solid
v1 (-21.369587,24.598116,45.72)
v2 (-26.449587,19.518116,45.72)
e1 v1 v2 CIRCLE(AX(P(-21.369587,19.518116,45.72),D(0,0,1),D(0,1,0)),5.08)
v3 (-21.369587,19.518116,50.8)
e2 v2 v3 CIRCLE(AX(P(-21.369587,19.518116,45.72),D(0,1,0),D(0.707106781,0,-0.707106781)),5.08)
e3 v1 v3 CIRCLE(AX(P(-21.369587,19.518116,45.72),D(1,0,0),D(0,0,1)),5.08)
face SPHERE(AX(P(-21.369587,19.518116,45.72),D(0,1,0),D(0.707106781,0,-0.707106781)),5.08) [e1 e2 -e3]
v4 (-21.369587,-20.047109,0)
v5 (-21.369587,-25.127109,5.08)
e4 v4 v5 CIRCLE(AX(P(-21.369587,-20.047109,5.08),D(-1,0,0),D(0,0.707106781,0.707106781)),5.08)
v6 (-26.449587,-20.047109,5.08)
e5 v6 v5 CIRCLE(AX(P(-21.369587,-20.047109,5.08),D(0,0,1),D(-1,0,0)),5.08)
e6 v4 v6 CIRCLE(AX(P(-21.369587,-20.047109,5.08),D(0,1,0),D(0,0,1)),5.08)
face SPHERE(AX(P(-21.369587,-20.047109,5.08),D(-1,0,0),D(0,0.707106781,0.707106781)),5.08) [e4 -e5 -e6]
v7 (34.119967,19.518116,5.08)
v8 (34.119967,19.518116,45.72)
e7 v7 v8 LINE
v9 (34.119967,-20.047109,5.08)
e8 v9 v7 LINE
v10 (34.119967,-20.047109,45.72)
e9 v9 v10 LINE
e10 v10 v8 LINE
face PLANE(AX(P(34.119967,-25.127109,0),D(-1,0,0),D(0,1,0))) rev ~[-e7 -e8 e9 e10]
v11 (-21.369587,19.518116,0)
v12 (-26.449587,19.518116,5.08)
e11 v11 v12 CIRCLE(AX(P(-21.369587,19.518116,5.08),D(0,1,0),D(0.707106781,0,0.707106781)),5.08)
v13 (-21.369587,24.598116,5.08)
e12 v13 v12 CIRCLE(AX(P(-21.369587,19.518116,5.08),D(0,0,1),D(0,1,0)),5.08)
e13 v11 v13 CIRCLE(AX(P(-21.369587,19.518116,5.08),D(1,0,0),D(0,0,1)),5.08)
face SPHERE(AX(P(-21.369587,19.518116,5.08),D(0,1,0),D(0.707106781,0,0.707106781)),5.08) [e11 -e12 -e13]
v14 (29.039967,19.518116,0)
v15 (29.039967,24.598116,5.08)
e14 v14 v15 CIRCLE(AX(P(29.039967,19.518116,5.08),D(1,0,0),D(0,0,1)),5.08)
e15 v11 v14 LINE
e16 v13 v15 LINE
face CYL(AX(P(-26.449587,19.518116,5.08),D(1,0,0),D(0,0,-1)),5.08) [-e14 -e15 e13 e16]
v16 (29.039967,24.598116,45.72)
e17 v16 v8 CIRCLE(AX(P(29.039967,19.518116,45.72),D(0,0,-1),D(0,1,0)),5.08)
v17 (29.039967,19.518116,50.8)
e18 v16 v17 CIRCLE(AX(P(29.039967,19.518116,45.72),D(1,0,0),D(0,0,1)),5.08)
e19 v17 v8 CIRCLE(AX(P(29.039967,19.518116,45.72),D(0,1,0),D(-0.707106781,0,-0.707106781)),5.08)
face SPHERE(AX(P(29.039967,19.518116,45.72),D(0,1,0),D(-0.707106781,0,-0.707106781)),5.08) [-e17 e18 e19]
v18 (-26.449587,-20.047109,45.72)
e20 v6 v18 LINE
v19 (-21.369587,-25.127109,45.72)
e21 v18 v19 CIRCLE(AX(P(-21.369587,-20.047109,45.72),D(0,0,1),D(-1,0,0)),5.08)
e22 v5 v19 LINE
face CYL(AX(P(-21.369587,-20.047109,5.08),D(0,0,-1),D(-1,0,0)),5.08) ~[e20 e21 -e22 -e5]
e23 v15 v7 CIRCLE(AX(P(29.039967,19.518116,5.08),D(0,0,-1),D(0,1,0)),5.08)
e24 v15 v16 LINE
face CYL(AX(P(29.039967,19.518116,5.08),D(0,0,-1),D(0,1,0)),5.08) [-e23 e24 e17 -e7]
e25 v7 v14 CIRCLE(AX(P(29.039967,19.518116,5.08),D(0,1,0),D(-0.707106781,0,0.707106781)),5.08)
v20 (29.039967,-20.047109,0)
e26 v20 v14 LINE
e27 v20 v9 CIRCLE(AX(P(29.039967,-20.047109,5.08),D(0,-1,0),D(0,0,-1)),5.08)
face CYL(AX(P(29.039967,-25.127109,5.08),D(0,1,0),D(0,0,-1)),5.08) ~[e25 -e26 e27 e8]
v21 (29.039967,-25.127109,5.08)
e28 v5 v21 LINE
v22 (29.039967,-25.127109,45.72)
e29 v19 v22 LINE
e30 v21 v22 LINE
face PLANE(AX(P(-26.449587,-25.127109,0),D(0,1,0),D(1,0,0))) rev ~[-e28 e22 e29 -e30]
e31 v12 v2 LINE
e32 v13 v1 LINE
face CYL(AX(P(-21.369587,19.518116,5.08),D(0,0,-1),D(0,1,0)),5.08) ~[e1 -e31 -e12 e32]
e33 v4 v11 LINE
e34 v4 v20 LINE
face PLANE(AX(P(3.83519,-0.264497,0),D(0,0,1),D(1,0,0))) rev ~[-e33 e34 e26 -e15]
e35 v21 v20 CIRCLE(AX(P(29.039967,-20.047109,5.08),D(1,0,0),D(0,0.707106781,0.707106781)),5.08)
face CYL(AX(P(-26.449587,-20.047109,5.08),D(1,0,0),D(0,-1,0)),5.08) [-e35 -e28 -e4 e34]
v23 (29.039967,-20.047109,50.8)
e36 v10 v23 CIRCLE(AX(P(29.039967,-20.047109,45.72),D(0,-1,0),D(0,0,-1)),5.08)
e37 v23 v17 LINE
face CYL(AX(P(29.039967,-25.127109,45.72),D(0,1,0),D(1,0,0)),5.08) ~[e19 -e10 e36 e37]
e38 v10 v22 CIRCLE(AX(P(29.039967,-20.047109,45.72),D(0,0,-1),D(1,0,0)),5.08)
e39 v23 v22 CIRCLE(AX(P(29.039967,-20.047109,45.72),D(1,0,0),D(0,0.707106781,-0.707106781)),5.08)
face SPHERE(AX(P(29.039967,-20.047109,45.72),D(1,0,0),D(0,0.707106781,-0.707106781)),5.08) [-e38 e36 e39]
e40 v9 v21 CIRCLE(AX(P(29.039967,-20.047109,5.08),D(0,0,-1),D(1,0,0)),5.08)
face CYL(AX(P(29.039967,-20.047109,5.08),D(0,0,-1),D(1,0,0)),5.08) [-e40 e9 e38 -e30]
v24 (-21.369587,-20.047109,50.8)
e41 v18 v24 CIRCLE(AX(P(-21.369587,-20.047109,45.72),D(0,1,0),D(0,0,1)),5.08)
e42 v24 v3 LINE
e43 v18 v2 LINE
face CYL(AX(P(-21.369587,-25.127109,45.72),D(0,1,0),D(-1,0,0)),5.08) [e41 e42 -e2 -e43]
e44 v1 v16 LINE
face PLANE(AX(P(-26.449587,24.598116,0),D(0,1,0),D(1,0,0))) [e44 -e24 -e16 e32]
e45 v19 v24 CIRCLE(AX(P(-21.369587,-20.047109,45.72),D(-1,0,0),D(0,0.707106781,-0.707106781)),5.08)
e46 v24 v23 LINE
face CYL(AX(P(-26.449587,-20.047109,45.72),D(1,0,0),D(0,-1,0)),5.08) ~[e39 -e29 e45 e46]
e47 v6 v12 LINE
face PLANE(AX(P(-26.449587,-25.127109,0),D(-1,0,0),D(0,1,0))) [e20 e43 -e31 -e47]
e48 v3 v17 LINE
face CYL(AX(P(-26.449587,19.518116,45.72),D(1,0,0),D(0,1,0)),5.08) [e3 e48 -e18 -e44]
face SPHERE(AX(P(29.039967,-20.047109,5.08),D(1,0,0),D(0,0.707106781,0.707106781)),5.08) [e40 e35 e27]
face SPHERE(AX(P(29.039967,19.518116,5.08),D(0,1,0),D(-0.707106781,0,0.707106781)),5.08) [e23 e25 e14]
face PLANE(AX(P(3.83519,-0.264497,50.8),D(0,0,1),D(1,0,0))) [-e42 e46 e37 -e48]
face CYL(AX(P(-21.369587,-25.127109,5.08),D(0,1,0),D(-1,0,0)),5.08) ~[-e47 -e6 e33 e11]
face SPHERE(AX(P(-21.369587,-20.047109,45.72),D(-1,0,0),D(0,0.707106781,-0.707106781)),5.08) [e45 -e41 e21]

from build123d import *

# Parameters (mm, degrees)
F0_W         = 60.5695545673
F0_H         = 49.7252251953
F1_DEPTH     = 50.8
F2_R         = 5.08
F3_R         = 5.08
F4_T1_DEPTH  = 40.64
F4_S5_W      = 5.08
F4_S5_H      = 5.08
F4_T6_DEPTH  = 5.08
F4_S11_W     = 5.08
F4_S11_H     = 5.08
F4_T12_DEPTH = 5.08
F4_S17_W     = 5.08
F4_S17_H     = 5.08
F4_T18_DEPTH = 5.08
F4_S23_W     = 5.08
F4_S23_H     = 5.08
F4_T24_DEPTH = 5.08
F4_S29_W     = 5.08
F4_S29_H     = 5.08
F4_T30_DEPTH = 5.08
F4_S35_W     = 5.08
F4_S35_H     = 5.08
F4_T36_DEPTH = 5.08
F4_S41_W     = 5.08
F4_S41_H     = 5.08
F4_T42_DEPTH = 5.08
F4_S47_W     = 5.08
F4_S47_H     = 5.08
F4_T48_DEPTH = 5.08


# Not quite as in the source:
# - a fillet or chamfer that OpenCascade refuses, or shapes differently, is made with other operations: its cross-section is extruded or revolved along the edge and cut away or added


with BuildPart() as f1:
    # F0 (on Top) → F1 (new body)
    with BuildSketch(Plane.XY):
        with Locations((3.8351900876, -0.2644965425)):
            Rectangle(F0_W, F0_H)
    extrude(amount=F1_DEPTH)

    # F2
    f2_edges = [f1.edges().sort_by_distance(p)[0] for p in [
        (3.83519, -25.127109, 50.8),
        (-26.449587, -0.264497, 50.8),
        (3.83519, 24.598116, 50.8),
        (34.119967, -0.264497, 50.8),
    ]]
    fillet(f2_edges, radius=F2_R)

    # F3
    f3_edges = [f1.edges().sort_by_distance(p)[0] for p in [
        (3.83519, -25.127109, 0),
        (34.119967, -0.264497, 0),
        (3.83519, 24.598116, 0),
        (-26.449587, -0.264497, 0),
    ]]
    fillet(f3_edges, radius=F3_R)

    # F4: fillet of radius 5.08 on 4 edges, made by hand

    # F4_s2 → F4_t1 (cut)
    with BuildSketch(Plane.XY.offset(5.08)):
        with BuildLine():
            ThreePointArc((-21.3695871961, 24.5981160551), (-24.9616896445, 23.1102185036), (-26.4495871961, 19.5181160551))
            Line((-26.4495871961, 19.5181160551), (-26.4495871961, 24.5981160551))
            Line((-26.4495871961, 24.5981160551), (-21.3695871961, 24.5981160551))
        make_face()
        with BuildLine():
            ThreePointArc((-26.4495871961, -20.0471091402), (-24.9616896445, -23.6392115886), (-21.3695871961, -25.1271091402))
            Line((-21.3695871961, -25.1271091402), (-26.4495871961, -25.1271091402))
            Line((-26.4495871961, -25.1271091402), (-26.4495871961, -20.0471091402))
        make_face()
        with BuildLine():
            ThreePointArc((29.0399673712, 24.5981160551), (32.6320698197, 23.1102185036), (34.1199673712, 19.5181160551))
            Line((34.1199673712, 19.5181160551), (34.1199673712, 24.5981160551))
            Line((34.1199673712, 24.5981160551), (29.0399673712, 24.5981160551))
        make_face()
        with BuildLine():
            ThreePointArc((34.1199673712, -20.0471091402), (32.6320698197, -23.6392115886), (29.0399673712, -25.1271091402))
            Line((29.0399673712, -25.1271091402), (34.1199673712, -25.1271091402))
            Line((34.1199673712, -25.1271091402), (34.1199673712, -20.0471091402))
        make_face()
    extrude(amount=F4_T1_DEPTH, mode=Mode.SUBTRACT)


with BuildPart() as f4_tool4:
    # F4_s5 → F4_t6 (new body)
    with BuildSketch(Plane.YZ.offset(29.0399673712)):
        with Locations((-22.5871091402, 2.54)):
            Rectangle(F4_S5_W, F4_S5_H)
    extrude(amount=F4_T6_DEPTH)

    # F4_s7 → F4_t8 (revolve, cut)
    with BuildSketch(Plane(origin=(29.0399673712, -20.0471091402, 5.08), x_dir=(0, 0.7071067812, 0.7071067812), z_dir=(0, 0.7071067812, -0.7071067812))):
        with BuildLine():
            ThreePointArc((0, -5.08), (5.08, 0), (0, 5.08))
            Line((0, 5.08), (0, -5.08))
        make_face()
    revolve(axis=Axis((29.0399673712, -20.0471091402, 5.08), (1, 0, 0)), mode=Mode.SUBTRACT)


with BuildPart() as f1_1:
    add(f1.part)

    # F4_t3: cut F4_tool4
    add(f4_tool4.part, mode=Mode.SUBTRACT)


with BuildPart() as f4_tool10:
    # F4_s11 → F4_t12 (new body)
    with BuildSketch(Plane.YZ.offset(29.0399673712)):
        with Locations((-22.5871091402, 48.26)):
            Rectangle(F4_S11_W, F4_S11_H)
    extrude(amount=F4_T12_DEPTH)

    # F4_s13 → F4_t14 (revolve, cut)
    with BuildSketch(Plane(origin=(29.0399673712, -20.0471091402, 45.72), x_dir=(0, 0.7071067812, -0.7071067812), z_dir=(0, -0.7071067812, -0.7071067812))):
        with BuildLine():
            ThreePointArc((0, -5.08), (5.08, 0), (0, 5.08))
            Line((0, 5.08), (0, -5.08))
        make_face()
    revolve(axis=Axis((29.0399673712, -20.0471091402, 45.72), (1, 0, 0)), mode=Mode.SUBTRACT)


with BuildPart() as f1_2:
    add(f1_1.part)

    # F4_t9: cut F4_tool10
    add(f4_tool10.part, mode=Mode.SUBTRACT)


with BuildPart() as f4_tool16:
    # F4_s17 → F4_t18 (new body)
    with BuildSketch(Plane.XZ.offset(-19.5181160551)):
        with Locations((31.5799673712, 2.54)):
            Rectangle(F4_S17_W, F4_S17_H)
    extrude(amount=-F4_T18_DEPTH)

    # F4_s19 → F4_t20 (revolve, cut)
    with BuildSketch(Plane(origin=(29.0399673712, 19.5181160551, 5.08), x_dir=(-0.7071067812, 0, 0.7071067812), z_dir=(-0.7071067812, 0, -0.7071067812))):
        with BuildLine():
            ThreePointArc((0, -5.08), (5.08, 0), (0, 5.08))
            Line((0, 5.08), (0, -5.08))
        make_face()
    revolve(axis=Axis((29.0399673712, 19.5181160551, 5.08), (0, 1, 0)), mode=Mode.SUBTRACT)


with BuildPart() as f1_3:
    add(f1_2.part)

    # F4_t15: cut F4_tool16
    add(f4_tool16.part, mode=Mode.SUBTRACT)


with BuildPart() as f4_tool22:
    # F4_s23 → F4_t24 (new body)
    with BuildSketch(Plane.XZ.offset(-19.5181160551)):
        with Locations((31.5799673712, 48.26)):
            Rectangle(F4_S23_W, F4_S23_H)
    extrude(amount=-F4_T24_DEPTH)

    # F4_s25 → F4_t26 (revolve, cut)
    with BuildSketch(Plane(origin=(29.0399673712, 19.5181160551, 45.72), x_dir=(-0.7071067812, 0, -0.7071067812), z_dir=(0.7071067812, 0, -0.7071067812))):
        with BuildLine():
            ThreePointArc((0, -5.08), (5.08, 0), (0, 5.08))
            Line((0, 5.08), (0, -5.08))
        make_face()
    revolve(axis=Axis((29.0399673712, 19.5181160551, 45.72), (0, 1, 0)), mode=Mode.SUBTRACT)


with BuildPart() as f1_4:
    add(f1_3.part)

    # F4_t21: cut F4_tool22
    add(f4_tool22.part, mode=Mode.SUBTRACT)


with BuildPart() as f4_tool28:
    # F4_s29 → F4_t30 (new body)
    with BuildSketch(Plane.YZ.offset(-21.3695871961)):
        with Locations((-22.5871091402, 2.54)):
            Rectangle(F4_S29_W, F4_S29_H)
    extrude(amount=-F4_T30_DEPTH)

    # F4_s31 → F4_t32 (revolve, cut)
    with BuildSketch(Plane(origin=(-21.3695871961, -20.0471091402, 5.08), x_dir=(0, 0.7071067812, 0.7071067812), z_dir=(0, -0.7071067812, 0.7071067812))):
        with BuildLine():
            ThreePointArc((0, -5.08), (5.08, 0), (0, 5.08))
            Line((0, 5.08), (0, -5.08))
        make_face()
    revolve(axis=Axis((-21.3695871961, -20.0471091402, 5.08), (-1, 0, 0)), mode=Mode.SUBTRACT)


with BuildPart() as f1_5:
    add(f1_4.part)

    # F4_t27: cut F4_tool28
    add(f4_tool28.part, mode=Mode.SUBTRACT)


with BuildPart() as f4_tool34:
    # F4_s35 → F4_t36 (new body)
    with BuildSketch(Plane.YZ.offset(-21.3695871961)):
        with Locations((-22.5871091402, 48.26)):
            Rectangle(F4_S35_W, F4_S35_H)
    extrude(amount=-F4_T36_DEPTH)

    # F4_s37 → F4_t38 (revolve, cut)
    with BuildSketch(Plane(origin=(-21.3695871961, -20.0471091402, 45.72), x_dir=(0, 0.7071067812, -0.7071067812), z_dir=(0, 0.7071067812, 0.7071067812))):
        with BuildLine():
            ThreePointArc((0, -5.08), (5.08, 0), (0, 5.08))
            Line((0, 5.08), (0, -5.08))
        make_face()
    revolve(axis=Axis((-21.3695871961, -20.0471091402, 45.72), (-1, 0, 0)), mode=Mode.SUBTRACT)


with BuildPart() as f1_6:
    add(f1_5.part)

    # F4_t33: cut F4_tool34
    add(f4_tool34.part, mode=Mode.SUBTRACT)


with BuildPart() as f4_tool40:
    # F4_s41 → F4_t42 (new body)
    with BuildSketch(Plane.XZ.offset(-19.5181160551)):
        with Locations((-23.9095871961, 2.54)):
            Rectangle(F4_S41_W, F4_S41_H)
    extrude(amount=-F4_T42_DEPTH)

    # F4_s43 → F4_t44 (revolve, cut)
    with BuildSketch(Plane(origin=(-21.3695871961, 19.5181160551, 5.08), x_dir=(0.7071067812, 0, 0.7071067812), z_dir=(-0.7071067812, 0, 0.7071067812))):
        with BuildLine():
            ThreePointArc((0, -5.08), (5.08, 0), (0, 5.08))
            Line((0, 5.08), (0, -5.08))
        make_face()
    revolve(axis=Axis((-21.3695871961, 19.5181160551, 5.08), (0, 1, 0)), mode=Mode.SUBTRACT)


with BuildPart() as f1_7:
    add(f1_6.part)

    # F4_t39: cut F4_tool40
    add(f4_tool40.part, mode=Mode.SUBTRACT)


with BuildPart() as f4_tool46:
    # F4_s47 → F4_t48 (new body)
    with BuildSketch(Plane.XZ.offset(-19.5181160551)):
        with Locations((-23.9095871961, 48.26)):
            Rectangle(F4_S47_W, F4_S47_H)
    extrude(amount=-F4_T48_DEPTH)

    # F4_s49 → F4_t50 (revolve, cut)
    with BuildSketch(Plane(origin=(-21.3695871961, 19.5181160551, 45.72), x_dir=(0.7071067812, 0, -0.7071067812), z_dir=(0.7071067812, 0, 0.7071067812))):
        with BuildLine():
            ThreePointArc((0, -5.08), (5.08, 0), (0, 5.08))
            Line((0, 5.08), (0, -5.08))
        make_face()
    revolve(axis=Axis((-21.3695871961, 19.5181160551, 45.72), (0, 1, 0)), mode=Mode.SUBTRACT)


with BuildPart() as f1_8:
    add(f1_7.part)

    # F4_t45: cut F4_tool46
    add(f4_tool46.part, mode=Mode.SUBTRACT)


solid = f1_8.part
